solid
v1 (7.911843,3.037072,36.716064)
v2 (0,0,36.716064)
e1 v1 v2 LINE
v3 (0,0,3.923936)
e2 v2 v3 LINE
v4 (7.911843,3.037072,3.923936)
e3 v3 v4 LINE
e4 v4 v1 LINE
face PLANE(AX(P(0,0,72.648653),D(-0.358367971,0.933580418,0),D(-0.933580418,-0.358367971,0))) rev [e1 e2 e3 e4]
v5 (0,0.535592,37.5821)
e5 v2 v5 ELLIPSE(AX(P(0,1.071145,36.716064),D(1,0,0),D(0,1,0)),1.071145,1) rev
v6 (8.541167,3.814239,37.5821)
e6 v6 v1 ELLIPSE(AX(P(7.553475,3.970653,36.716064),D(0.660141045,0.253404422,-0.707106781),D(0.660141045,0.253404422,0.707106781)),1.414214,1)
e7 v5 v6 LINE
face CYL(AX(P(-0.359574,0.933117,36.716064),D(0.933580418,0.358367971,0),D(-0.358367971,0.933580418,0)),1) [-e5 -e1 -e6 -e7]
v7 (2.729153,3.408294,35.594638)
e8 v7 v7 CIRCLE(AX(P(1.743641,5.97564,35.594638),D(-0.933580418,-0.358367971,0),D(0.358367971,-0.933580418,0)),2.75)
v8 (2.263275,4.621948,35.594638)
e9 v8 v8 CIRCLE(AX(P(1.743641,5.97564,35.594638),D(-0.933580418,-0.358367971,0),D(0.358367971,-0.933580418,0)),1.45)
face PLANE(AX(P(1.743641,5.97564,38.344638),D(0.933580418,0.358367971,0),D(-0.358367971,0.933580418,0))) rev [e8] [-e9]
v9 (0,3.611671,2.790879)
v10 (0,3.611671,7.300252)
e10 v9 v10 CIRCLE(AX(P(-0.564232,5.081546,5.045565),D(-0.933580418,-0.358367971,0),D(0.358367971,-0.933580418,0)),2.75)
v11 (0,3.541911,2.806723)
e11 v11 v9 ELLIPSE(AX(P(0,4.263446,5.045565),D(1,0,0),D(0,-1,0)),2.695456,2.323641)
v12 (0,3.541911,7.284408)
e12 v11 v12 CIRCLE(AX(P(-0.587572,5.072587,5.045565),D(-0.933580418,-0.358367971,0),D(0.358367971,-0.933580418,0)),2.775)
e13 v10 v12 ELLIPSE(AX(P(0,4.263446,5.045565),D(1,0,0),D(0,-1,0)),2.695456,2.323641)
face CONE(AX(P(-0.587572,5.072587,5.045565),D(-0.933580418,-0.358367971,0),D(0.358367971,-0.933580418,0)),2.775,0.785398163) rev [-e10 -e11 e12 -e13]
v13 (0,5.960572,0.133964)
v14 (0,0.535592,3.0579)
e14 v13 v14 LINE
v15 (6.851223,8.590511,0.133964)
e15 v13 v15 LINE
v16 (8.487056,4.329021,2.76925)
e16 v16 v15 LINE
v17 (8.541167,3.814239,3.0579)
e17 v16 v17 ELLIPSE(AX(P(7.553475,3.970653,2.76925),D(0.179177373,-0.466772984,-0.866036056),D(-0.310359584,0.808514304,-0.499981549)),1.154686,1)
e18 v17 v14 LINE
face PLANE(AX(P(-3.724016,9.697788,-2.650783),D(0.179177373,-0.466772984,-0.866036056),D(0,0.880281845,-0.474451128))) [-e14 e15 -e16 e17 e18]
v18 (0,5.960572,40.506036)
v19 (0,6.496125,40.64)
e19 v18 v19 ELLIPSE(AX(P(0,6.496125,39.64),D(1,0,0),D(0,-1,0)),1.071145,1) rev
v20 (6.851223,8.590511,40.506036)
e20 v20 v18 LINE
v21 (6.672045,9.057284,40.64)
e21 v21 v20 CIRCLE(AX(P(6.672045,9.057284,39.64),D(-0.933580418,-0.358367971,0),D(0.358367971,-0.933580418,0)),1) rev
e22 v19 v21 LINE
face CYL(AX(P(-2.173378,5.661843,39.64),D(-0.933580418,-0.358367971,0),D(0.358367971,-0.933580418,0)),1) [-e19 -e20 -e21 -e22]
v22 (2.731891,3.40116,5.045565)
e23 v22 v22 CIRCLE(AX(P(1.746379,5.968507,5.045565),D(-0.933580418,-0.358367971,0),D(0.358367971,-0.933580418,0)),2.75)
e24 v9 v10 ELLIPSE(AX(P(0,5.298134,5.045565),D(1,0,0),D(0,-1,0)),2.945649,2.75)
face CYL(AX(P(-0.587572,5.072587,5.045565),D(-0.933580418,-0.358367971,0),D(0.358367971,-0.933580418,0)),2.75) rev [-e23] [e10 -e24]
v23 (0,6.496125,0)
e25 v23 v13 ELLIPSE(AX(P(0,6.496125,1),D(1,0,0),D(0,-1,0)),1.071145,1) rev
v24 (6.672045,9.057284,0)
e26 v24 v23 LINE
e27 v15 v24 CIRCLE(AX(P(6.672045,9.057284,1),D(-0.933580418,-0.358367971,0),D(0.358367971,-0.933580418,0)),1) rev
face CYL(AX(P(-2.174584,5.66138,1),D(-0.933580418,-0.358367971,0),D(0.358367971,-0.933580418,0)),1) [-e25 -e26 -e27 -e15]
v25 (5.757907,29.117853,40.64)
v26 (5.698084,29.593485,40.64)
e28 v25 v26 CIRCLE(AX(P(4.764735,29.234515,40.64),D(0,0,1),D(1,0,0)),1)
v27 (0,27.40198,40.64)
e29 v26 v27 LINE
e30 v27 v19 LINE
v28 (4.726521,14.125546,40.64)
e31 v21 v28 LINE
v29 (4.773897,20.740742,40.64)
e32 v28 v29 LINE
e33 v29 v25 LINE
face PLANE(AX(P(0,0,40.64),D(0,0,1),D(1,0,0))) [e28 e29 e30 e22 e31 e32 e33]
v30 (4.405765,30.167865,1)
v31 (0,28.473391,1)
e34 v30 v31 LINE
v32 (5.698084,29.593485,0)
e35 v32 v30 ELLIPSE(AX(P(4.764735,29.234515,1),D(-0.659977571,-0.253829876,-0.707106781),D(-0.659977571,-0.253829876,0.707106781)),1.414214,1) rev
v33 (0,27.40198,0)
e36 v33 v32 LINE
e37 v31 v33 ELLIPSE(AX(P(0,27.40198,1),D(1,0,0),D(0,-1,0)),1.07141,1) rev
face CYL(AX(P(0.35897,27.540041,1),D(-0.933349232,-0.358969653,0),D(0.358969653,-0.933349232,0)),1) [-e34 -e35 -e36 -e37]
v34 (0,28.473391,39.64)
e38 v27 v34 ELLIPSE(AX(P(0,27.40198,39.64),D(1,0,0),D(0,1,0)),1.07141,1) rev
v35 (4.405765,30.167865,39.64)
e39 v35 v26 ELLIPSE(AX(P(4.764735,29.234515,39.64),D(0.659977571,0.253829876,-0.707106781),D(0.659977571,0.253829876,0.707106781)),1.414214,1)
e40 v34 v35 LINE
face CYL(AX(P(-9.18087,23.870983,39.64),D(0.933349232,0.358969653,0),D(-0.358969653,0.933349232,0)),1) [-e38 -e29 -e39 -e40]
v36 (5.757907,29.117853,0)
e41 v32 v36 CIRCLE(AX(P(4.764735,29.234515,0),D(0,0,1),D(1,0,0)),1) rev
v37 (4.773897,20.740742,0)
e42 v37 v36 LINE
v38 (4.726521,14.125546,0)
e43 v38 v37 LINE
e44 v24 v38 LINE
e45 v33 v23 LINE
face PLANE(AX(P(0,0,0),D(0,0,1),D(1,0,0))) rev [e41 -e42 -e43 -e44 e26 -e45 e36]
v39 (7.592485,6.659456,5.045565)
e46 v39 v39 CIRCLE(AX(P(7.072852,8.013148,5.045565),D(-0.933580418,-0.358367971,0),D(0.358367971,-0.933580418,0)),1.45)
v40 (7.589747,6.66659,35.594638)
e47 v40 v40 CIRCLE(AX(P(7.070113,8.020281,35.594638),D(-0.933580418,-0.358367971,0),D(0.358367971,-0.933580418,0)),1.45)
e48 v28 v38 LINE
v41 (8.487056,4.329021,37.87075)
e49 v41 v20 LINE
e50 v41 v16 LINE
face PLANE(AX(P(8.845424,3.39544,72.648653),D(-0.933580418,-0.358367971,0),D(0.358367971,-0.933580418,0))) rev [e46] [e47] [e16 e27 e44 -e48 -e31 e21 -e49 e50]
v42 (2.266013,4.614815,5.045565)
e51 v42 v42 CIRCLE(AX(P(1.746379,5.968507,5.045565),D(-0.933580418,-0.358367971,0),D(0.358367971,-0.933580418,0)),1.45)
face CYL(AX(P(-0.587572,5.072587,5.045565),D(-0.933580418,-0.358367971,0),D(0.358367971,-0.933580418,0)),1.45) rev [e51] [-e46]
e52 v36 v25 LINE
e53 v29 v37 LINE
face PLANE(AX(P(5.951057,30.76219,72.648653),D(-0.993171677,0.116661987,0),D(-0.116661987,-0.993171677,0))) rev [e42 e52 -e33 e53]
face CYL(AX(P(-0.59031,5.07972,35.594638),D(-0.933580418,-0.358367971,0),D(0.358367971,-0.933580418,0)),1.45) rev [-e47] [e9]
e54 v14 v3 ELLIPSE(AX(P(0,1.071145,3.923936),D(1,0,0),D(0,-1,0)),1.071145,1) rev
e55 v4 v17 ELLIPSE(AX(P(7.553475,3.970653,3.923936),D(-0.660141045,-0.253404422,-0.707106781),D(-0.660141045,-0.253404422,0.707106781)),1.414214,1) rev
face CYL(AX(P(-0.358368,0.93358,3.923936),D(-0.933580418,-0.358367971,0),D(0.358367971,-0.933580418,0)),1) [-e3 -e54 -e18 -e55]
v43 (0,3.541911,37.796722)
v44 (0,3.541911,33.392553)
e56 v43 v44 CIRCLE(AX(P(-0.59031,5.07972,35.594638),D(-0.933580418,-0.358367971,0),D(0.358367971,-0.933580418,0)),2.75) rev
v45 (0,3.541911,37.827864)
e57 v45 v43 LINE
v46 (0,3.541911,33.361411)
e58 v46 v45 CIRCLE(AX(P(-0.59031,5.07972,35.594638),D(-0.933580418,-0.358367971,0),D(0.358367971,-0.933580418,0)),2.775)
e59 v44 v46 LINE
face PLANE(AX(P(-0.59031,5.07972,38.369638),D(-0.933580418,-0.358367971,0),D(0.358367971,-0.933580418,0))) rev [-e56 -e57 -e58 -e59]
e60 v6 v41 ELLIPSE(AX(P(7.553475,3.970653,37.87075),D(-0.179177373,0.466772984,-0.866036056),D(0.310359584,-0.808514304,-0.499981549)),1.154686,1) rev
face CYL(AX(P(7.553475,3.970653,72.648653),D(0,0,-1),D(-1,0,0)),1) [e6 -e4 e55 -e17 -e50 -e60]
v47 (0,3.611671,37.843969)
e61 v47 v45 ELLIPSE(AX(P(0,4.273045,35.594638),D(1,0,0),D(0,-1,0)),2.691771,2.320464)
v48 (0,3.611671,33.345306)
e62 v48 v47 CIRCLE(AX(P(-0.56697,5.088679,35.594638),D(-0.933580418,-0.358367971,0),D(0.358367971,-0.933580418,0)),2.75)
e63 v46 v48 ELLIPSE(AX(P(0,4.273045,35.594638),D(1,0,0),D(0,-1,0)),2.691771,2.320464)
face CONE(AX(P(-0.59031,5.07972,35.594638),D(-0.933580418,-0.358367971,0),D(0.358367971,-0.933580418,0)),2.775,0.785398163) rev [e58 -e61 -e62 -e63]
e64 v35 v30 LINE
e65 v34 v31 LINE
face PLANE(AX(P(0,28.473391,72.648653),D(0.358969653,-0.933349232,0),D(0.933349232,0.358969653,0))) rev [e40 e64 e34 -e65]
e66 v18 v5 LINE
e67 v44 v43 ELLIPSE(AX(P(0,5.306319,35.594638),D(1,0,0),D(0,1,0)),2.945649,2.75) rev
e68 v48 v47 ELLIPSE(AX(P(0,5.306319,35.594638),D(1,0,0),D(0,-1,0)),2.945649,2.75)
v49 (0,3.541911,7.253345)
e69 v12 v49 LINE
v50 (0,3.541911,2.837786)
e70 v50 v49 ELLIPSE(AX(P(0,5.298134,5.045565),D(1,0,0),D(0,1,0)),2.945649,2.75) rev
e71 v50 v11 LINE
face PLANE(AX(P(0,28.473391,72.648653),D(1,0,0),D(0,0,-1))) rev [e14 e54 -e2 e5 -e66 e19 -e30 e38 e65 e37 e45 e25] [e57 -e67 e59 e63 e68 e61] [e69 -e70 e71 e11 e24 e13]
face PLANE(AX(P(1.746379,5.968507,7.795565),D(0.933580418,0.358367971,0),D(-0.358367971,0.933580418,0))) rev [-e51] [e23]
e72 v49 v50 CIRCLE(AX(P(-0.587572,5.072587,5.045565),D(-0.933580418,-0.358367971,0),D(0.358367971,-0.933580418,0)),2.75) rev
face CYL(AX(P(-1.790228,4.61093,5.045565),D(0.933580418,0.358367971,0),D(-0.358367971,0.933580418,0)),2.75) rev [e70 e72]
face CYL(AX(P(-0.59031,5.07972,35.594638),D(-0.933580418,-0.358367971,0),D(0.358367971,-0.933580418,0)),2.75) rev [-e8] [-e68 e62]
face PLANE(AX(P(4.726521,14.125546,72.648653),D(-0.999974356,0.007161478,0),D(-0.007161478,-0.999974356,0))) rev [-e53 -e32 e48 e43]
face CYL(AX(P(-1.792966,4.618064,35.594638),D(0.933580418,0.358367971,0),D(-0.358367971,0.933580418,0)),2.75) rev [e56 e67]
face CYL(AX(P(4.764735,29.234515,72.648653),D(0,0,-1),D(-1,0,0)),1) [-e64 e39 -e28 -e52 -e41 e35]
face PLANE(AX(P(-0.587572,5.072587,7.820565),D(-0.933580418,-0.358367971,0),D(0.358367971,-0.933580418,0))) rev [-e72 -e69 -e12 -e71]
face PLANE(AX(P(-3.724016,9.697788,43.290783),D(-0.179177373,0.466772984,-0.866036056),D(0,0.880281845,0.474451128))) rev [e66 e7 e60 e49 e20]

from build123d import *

# Parameters (mm, degrees)
EXTRUDE_L_DEPTH        = 40.640000266
SKETCH_506_R           = 1.642286764
EXTRUDE_A_DEPTH        = 8.205424
SKETCH_6_R             = 1.647216999
EXTRUDE_B_DEPTH        = 8.205424
SKETCH_66_R            = 2.75
CUT_EXTRUDE_2755_DEPTH = 51.448100318
CUT_EXTRUDE_2790_REACH = 51.787
FILLET_3_R             = 1


with BuildPart() as part:
    # 主L型: read off the stored shape, not the designer's step
    # 主L型 outline → 主L型 (new body)
    with BuildSketch(Plane.XY):
        Polygon((0, 28.473390503), (0, 0), (8.845423506, 3.395440187), (4.726521328, 14.125546488), (4.773897119, 20.740741864), (5.951057155, 30.762189648), align=None)
    extrude(amount=EXTRUDE_L_DEPTH)

    # Sketch 506 → 螺丝台A (add)
    with BuildSketch(Plane(origin=(8.845423506, 3.395440187, 0), x_dir=(0, 0, -1), z_dir=(0.9335804184498224, 0.3583679705094393, 0))):
        with Locations((-5.045565417, 4.946234453)):
            Circle(SKETCH_506_R)
    extrude(amount=-EXTRUDE_A_DEPTH)

    # 螺丝穿出面<6> → 螺丝台B (add)
    with BuildSketch(Plane(origin=(8.845423506, 3.395440187, 0), x_dir=(0, 0, -1), z_dir=(0.9335804184498224, 0.3583679705094393, 0))):
        with Locations((-35.594637562, 4.953875303)):
            Circle(SKETCH_6_R)
    extrude(amount=-EXTRUDE_B_DEPTH)

    # 草图64 → 螺丝A M2.5 凹头盖螺钉的柱形沉头孔14 (revolve, cut)
    with BuildSketch(Plane(origin=(-0.587571577, 5.072586706, 5.045565417), x_dir=(0.3583679705094393, -0.9335804184498224, 0), z_dir=(0, 0, 1))):
        Polygon((0, 0), (0, 18.012790366), (1.45, 18.012790366), (1.45, 2.5), (2.75, 2.5), (2.75, 0.025), (2.775, 0), align=None)
    revolve(axis=Axis((-6.515807234, 2.796950093, 5.045565417), (0.9335804184498225, 0.3583679705094394, 0)), mode=Mode.SUBTRACT)

    # 草图65 → 螺丝B M2.5 凹头盖螺钉的柱形沉头孔15 (revolve, cut)
    with BuildSketch(Plane(origin=(-0.590309813, 5.079720054, 35.594637562), x_dir=(0.3583679705094393, -0.9335804184498224, 0), z_dir=(0, 0, 1))):
        Polygon((0, 0), (0, 18.012790366), (1.45, 18.012790366), (1.45, 2.5), (2.75, 2.5), (2.75, 0.025), (2.775, 0), align=None)
    revolve(axis=Axis((-6.51854547, 2.804083441, 35.594637562), (0.9335804184498225, 0.35836797050943936, 0)), mode=Mode.SUBTRACT)

    # 草图66 → Cut-Extrude 2755 (cut, through all)
    with BuildSketch(Plane(origin=(3.518951472, 1.350799002, 0), x_dir=(0, 0, 1), z_dir=(-0.9335804184498225, -0.3583679705094393, 0))):
        with Locations(Location((5.045565417, 4.946234453, 0), (0, 0, 270))):
            Circle(SKETCH_66_R)
        with Locations(Location((35.594637562, 4.953875303, 0), (0, 0, 270))):
            Circle(SKETCH_66_R)
    extrude(amount=CUT_EXTRUDE_2755_DEPTH, mode=Mode.SUBTRACT)

    # Cut-Extrude 2790: up to this plane
    cut_extrude_2790_end = Plane(origin=(0, 28.473390503, 72.648652673), z_dir=(1, 0, 0))
    # 螺丝穿出面<7> → Cut-Extrude 2790 (cut, up to the surface)
    with BuildSketch(Plane(origin=(8.845423506, 3.395440187, 0), x_dir=(0, 0, -1), z_dir=(0.9335804184498224, 0.3583679705094393, 0)), mode=Mode.PRIVATE) as cut_extrude_2790_sk1:
        Polygon((0, 5.796717469), (-3.346571729, 0), (0, 0), align=None)
    cut_extrude_2790_tool1 = split(extrude(cut_extrude_2790_sk1.sketch, amount=-CUT_EXTRUDE_2790_REACH, mode=Mode.PRIVATE), bisect_by=cut_extrude_2790_end, keep=Keep.BOTH, mode=Mode.PRIVATE)
    cut_extrude_2790 = cut_extrude_2790_tool1.solids().sort_by_distance((8.152971, 5.199341, 1.115524))[0]
    add(cut_extrude_2790, mode=Mode.SUBTRACT)

    # 镜向6: Cut-Extrude 2790 across plane
    add(cut_extrude_2790.mirror(Plane(origin=(0, 0, 20.320000133), x_dir=(1, 0, 0), z_dir=(0, 0, -1))), mode=Mode.SUBTRACT)

    # 圆角3
    fillet_3_edges = [part.edges().sort_by_distance(p)[0] for p in [
        (5.951057155, 30.762189648, 20.320000133),
        (2.975528577, 29.617790076, 0),
        (2.975528577, 29.617790076, 40.640000266),
        (4.422711753, 1.697720093, 3.346571729),
        (3.384032816, 7.508133528, 0),
        (8.845423506, 3.395440187, 20.320000133),
        (3.384032816, 7.508133528, 40.640000266),
        (4.422711753, 1.697720093, 37.293428537),
    ]]
    fillet(fillet_3_edges, radius=FILLET_3_R)


solid = part.part
